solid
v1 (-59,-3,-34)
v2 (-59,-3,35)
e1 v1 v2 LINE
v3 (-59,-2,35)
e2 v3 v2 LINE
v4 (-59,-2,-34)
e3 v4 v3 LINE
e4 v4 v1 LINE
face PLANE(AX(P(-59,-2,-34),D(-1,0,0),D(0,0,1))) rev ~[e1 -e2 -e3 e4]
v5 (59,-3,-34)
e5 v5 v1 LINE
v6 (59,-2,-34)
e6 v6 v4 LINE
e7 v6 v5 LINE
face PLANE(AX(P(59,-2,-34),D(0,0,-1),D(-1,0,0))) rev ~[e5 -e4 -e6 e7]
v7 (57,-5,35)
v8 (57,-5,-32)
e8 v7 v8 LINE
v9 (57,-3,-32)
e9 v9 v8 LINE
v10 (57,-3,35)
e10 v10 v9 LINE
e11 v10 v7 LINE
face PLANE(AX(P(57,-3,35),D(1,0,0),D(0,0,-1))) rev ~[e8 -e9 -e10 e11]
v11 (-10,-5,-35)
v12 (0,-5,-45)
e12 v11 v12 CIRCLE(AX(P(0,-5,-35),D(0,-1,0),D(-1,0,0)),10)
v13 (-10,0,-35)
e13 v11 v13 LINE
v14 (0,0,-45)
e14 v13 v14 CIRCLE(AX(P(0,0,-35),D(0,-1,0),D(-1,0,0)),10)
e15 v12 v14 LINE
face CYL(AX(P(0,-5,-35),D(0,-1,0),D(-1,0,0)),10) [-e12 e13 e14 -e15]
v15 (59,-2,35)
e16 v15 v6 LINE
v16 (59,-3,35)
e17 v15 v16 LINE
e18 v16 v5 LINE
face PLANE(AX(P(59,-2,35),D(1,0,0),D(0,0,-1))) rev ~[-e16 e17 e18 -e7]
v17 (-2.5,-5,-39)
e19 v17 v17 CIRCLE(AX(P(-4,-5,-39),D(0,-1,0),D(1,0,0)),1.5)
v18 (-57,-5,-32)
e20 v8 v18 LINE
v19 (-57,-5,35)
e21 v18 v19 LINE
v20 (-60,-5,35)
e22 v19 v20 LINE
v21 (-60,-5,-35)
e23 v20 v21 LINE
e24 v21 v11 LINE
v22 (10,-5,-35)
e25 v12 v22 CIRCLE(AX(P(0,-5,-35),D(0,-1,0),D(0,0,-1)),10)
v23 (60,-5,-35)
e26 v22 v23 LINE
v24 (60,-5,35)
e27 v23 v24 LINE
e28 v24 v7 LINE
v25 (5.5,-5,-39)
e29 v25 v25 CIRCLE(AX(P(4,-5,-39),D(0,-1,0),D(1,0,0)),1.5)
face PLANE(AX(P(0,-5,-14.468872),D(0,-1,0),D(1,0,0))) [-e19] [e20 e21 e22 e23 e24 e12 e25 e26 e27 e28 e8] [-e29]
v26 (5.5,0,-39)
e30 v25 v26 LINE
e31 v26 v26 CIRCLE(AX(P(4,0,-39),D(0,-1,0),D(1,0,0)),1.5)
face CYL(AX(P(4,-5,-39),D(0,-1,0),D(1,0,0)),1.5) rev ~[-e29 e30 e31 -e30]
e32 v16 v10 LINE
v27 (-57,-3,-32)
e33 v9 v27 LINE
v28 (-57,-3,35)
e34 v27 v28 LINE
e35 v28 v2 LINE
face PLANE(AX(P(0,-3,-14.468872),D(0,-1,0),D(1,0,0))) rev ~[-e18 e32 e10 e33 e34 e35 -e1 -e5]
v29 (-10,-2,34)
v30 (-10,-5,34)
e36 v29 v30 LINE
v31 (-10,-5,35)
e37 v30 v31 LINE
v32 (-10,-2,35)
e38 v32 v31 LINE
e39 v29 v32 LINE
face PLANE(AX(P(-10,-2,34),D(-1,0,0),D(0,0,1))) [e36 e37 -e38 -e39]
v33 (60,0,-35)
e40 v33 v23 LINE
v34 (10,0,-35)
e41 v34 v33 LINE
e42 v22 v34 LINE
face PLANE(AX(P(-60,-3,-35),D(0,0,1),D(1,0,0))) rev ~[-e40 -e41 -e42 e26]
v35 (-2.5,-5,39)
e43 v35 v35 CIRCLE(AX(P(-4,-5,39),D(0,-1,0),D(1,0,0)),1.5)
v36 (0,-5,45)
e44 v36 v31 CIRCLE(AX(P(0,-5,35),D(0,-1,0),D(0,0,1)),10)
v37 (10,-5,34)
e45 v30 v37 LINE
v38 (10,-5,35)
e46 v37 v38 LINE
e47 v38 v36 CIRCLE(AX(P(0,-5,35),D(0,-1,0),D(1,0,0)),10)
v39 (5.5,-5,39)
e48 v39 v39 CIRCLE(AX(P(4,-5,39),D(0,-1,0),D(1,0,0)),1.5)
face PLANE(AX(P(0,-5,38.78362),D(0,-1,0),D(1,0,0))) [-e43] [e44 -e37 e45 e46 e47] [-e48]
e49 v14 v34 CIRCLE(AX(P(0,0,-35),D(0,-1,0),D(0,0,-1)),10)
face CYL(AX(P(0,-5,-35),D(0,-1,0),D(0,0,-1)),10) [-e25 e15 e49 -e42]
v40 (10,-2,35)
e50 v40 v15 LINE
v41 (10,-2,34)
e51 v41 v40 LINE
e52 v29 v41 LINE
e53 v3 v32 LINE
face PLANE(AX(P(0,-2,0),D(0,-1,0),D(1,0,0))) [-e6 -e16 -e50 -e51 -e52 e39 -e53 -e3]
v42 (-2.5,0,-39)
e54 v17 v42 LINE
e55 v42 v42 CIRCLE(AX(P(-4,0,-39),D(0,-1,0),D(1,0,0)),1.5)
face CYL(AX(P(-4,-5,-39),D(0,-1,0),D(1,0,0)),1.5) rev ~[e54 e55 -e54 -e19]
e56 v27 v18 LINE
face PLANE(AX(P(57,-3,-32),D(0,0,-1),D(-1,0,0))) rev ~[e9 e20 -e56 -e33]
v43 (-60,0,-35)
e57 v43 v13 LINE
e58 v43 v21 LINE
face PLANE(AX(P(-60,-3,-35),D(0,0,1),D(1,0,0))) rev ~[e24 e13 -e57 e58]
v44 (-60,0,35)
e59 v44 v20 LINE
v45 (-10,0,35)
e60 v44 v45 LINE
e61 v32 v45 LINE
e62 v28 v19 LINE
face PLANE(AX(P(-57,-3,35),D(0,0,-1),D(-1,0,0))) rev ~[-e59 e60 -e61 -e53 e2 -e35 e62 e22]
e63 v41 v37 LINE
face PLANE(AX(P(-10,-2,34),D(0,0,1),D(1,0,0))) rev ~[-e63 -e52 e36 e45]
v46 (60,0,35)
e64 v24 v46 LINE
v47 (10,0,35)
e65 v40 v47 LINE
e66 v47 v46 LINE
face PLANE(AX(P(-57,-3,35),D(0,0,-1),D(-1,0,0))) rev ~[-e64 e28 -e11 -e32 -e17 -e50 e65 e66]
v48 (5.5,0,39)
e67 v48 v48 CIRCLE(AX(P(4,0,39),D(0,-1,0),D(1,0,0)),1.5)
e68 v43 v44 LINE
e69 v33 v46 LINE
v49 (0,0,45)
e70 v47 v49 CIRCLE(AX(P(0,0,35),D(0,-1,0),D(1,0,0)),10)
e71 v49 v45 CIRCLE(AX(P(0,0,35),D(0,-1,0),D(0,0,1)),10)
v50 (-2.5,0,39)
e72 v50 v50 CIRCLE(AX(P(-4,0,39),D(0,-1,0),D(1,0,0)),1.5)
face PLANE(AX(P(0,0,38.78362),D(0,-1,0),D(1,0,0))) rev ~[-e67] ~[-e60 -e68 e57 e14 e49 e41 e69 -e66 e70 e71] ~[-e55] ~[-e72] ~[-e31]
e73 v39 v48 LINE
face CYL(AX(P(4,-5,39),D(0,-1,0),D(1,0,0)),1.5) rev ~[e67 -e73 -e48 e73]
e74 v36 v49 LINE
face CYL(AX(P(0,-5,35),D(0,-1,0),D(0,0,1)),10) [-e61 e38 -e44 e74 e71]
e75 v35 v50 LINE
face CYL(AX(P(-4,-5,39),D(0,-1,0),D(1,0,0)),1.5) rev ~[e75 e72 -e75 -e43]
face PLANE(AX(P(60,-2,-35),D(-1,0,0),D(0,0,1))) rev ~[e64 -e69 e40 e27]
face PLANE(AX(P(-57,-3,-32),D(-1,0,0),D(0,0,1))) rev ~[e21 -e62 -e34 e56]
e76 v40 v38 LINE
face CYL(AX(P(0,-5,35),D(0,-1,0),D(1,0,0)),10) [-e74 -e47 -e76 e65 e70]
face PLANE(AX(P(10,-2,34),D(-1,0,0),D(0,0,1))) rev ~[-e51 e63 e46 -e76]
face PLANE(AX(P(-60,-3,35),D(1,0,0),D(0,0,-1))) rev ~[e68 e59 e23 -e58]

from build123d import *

# Parameters (mm, degrees)
F0_W      = 120
F0_H      = 70
F1_DEPTH  = 2
F3_DEPTH  = 1
F5_DEPTH  = 2
F6_W      = 20
F6_H      = 1
F7_DEPTH  = 3
F9_DEPTH  = 5
F11_DEPTH = 5
F12_R     = 1.5
F13_DEPTH = 5.001


# Not quite as in the source:
# - a feature names something its author has since deleted; it is built from what else it names


with BuildPart() as f1:
    # F0 (on Front) → F1 (new body)
    with BuildSketch(Plane.XZ):
        Rectangle(F0_W, F0_H)
    extrude(amount=F1_DEPTH)

    # F2 (on face) → F3 (join)
    with BuildSketch(Plane.XZ.offset(2)):
        Polygon((-59, -34), (-59, 35), (-60, 35), (-60, -35), (60, -35), (60, 35), (59, 35), (59, -34), align=None)
    extrude(amount=F3_DEPTH)

    # F4 (on face) → F5 (join)
    with BuildSketch(Plane.XZ.offset(3)):
        Polygon((-57, 35), (-60, 35), (-60, -35), (60, -35), (60, 35), (57, 35), (57, -32), (-57, -32), align=None)
    extrude(amount=F5_DEPTH)

    # F6 (on face) → F7 (join)
    with BuildSketch(Plane.XZ.offset(2)):
        with Locations((0, 34.5)):
            Rectangle(F6_W, F6_H)
    extrude(amount=F7_DEPTH)

    # F8 (on face) → F9 (join)
    with BuildSketch(Plane.XZ.offset(5)):
        with BuildLine():
            ThreePointArc((0, 45), (-7.0710678119, 42.0710678119), (-10, 35))
            Line((-10, 35), (10, 35))
            ThreePointArc((10, 35), (7.0710678119, 42.0710678119), (0, 45))
        make_face()
    extrude(amount=-F9_DEPTH)

    # F10 (on face) → F11 (join)
    with BuildSketch(Plane.XZ.offset(5)):
        with BuildLine():
            Line((10, -35), (-10, -35))
            ThreePointArc((-10, -35), (-7.0710678119, -42.0710678119), (0, -45))
            ThreePointArc((0, -45), (7.0710678119, -42.0710678119), (10, -35))
        make_face()
    extrude(amount=-F11_DEPTH)

    # F12 (on face) → F13 (cut, through all)
    with BuildSketch(Plane.XZ.offset(5)):
        with Locations((-4, -39)):
            Circle(F12_R)
        with Locations((4, -39)):
            Circle(F12_R)
        with Locations((-4, 39)):
            Circle(F12_R)
        with Locations((4, 39)):
            Circle(F12_R)
    extrude(amount=-F13_DEPTH, mode=Mode.SUBTRACT)


solid = f1.part
